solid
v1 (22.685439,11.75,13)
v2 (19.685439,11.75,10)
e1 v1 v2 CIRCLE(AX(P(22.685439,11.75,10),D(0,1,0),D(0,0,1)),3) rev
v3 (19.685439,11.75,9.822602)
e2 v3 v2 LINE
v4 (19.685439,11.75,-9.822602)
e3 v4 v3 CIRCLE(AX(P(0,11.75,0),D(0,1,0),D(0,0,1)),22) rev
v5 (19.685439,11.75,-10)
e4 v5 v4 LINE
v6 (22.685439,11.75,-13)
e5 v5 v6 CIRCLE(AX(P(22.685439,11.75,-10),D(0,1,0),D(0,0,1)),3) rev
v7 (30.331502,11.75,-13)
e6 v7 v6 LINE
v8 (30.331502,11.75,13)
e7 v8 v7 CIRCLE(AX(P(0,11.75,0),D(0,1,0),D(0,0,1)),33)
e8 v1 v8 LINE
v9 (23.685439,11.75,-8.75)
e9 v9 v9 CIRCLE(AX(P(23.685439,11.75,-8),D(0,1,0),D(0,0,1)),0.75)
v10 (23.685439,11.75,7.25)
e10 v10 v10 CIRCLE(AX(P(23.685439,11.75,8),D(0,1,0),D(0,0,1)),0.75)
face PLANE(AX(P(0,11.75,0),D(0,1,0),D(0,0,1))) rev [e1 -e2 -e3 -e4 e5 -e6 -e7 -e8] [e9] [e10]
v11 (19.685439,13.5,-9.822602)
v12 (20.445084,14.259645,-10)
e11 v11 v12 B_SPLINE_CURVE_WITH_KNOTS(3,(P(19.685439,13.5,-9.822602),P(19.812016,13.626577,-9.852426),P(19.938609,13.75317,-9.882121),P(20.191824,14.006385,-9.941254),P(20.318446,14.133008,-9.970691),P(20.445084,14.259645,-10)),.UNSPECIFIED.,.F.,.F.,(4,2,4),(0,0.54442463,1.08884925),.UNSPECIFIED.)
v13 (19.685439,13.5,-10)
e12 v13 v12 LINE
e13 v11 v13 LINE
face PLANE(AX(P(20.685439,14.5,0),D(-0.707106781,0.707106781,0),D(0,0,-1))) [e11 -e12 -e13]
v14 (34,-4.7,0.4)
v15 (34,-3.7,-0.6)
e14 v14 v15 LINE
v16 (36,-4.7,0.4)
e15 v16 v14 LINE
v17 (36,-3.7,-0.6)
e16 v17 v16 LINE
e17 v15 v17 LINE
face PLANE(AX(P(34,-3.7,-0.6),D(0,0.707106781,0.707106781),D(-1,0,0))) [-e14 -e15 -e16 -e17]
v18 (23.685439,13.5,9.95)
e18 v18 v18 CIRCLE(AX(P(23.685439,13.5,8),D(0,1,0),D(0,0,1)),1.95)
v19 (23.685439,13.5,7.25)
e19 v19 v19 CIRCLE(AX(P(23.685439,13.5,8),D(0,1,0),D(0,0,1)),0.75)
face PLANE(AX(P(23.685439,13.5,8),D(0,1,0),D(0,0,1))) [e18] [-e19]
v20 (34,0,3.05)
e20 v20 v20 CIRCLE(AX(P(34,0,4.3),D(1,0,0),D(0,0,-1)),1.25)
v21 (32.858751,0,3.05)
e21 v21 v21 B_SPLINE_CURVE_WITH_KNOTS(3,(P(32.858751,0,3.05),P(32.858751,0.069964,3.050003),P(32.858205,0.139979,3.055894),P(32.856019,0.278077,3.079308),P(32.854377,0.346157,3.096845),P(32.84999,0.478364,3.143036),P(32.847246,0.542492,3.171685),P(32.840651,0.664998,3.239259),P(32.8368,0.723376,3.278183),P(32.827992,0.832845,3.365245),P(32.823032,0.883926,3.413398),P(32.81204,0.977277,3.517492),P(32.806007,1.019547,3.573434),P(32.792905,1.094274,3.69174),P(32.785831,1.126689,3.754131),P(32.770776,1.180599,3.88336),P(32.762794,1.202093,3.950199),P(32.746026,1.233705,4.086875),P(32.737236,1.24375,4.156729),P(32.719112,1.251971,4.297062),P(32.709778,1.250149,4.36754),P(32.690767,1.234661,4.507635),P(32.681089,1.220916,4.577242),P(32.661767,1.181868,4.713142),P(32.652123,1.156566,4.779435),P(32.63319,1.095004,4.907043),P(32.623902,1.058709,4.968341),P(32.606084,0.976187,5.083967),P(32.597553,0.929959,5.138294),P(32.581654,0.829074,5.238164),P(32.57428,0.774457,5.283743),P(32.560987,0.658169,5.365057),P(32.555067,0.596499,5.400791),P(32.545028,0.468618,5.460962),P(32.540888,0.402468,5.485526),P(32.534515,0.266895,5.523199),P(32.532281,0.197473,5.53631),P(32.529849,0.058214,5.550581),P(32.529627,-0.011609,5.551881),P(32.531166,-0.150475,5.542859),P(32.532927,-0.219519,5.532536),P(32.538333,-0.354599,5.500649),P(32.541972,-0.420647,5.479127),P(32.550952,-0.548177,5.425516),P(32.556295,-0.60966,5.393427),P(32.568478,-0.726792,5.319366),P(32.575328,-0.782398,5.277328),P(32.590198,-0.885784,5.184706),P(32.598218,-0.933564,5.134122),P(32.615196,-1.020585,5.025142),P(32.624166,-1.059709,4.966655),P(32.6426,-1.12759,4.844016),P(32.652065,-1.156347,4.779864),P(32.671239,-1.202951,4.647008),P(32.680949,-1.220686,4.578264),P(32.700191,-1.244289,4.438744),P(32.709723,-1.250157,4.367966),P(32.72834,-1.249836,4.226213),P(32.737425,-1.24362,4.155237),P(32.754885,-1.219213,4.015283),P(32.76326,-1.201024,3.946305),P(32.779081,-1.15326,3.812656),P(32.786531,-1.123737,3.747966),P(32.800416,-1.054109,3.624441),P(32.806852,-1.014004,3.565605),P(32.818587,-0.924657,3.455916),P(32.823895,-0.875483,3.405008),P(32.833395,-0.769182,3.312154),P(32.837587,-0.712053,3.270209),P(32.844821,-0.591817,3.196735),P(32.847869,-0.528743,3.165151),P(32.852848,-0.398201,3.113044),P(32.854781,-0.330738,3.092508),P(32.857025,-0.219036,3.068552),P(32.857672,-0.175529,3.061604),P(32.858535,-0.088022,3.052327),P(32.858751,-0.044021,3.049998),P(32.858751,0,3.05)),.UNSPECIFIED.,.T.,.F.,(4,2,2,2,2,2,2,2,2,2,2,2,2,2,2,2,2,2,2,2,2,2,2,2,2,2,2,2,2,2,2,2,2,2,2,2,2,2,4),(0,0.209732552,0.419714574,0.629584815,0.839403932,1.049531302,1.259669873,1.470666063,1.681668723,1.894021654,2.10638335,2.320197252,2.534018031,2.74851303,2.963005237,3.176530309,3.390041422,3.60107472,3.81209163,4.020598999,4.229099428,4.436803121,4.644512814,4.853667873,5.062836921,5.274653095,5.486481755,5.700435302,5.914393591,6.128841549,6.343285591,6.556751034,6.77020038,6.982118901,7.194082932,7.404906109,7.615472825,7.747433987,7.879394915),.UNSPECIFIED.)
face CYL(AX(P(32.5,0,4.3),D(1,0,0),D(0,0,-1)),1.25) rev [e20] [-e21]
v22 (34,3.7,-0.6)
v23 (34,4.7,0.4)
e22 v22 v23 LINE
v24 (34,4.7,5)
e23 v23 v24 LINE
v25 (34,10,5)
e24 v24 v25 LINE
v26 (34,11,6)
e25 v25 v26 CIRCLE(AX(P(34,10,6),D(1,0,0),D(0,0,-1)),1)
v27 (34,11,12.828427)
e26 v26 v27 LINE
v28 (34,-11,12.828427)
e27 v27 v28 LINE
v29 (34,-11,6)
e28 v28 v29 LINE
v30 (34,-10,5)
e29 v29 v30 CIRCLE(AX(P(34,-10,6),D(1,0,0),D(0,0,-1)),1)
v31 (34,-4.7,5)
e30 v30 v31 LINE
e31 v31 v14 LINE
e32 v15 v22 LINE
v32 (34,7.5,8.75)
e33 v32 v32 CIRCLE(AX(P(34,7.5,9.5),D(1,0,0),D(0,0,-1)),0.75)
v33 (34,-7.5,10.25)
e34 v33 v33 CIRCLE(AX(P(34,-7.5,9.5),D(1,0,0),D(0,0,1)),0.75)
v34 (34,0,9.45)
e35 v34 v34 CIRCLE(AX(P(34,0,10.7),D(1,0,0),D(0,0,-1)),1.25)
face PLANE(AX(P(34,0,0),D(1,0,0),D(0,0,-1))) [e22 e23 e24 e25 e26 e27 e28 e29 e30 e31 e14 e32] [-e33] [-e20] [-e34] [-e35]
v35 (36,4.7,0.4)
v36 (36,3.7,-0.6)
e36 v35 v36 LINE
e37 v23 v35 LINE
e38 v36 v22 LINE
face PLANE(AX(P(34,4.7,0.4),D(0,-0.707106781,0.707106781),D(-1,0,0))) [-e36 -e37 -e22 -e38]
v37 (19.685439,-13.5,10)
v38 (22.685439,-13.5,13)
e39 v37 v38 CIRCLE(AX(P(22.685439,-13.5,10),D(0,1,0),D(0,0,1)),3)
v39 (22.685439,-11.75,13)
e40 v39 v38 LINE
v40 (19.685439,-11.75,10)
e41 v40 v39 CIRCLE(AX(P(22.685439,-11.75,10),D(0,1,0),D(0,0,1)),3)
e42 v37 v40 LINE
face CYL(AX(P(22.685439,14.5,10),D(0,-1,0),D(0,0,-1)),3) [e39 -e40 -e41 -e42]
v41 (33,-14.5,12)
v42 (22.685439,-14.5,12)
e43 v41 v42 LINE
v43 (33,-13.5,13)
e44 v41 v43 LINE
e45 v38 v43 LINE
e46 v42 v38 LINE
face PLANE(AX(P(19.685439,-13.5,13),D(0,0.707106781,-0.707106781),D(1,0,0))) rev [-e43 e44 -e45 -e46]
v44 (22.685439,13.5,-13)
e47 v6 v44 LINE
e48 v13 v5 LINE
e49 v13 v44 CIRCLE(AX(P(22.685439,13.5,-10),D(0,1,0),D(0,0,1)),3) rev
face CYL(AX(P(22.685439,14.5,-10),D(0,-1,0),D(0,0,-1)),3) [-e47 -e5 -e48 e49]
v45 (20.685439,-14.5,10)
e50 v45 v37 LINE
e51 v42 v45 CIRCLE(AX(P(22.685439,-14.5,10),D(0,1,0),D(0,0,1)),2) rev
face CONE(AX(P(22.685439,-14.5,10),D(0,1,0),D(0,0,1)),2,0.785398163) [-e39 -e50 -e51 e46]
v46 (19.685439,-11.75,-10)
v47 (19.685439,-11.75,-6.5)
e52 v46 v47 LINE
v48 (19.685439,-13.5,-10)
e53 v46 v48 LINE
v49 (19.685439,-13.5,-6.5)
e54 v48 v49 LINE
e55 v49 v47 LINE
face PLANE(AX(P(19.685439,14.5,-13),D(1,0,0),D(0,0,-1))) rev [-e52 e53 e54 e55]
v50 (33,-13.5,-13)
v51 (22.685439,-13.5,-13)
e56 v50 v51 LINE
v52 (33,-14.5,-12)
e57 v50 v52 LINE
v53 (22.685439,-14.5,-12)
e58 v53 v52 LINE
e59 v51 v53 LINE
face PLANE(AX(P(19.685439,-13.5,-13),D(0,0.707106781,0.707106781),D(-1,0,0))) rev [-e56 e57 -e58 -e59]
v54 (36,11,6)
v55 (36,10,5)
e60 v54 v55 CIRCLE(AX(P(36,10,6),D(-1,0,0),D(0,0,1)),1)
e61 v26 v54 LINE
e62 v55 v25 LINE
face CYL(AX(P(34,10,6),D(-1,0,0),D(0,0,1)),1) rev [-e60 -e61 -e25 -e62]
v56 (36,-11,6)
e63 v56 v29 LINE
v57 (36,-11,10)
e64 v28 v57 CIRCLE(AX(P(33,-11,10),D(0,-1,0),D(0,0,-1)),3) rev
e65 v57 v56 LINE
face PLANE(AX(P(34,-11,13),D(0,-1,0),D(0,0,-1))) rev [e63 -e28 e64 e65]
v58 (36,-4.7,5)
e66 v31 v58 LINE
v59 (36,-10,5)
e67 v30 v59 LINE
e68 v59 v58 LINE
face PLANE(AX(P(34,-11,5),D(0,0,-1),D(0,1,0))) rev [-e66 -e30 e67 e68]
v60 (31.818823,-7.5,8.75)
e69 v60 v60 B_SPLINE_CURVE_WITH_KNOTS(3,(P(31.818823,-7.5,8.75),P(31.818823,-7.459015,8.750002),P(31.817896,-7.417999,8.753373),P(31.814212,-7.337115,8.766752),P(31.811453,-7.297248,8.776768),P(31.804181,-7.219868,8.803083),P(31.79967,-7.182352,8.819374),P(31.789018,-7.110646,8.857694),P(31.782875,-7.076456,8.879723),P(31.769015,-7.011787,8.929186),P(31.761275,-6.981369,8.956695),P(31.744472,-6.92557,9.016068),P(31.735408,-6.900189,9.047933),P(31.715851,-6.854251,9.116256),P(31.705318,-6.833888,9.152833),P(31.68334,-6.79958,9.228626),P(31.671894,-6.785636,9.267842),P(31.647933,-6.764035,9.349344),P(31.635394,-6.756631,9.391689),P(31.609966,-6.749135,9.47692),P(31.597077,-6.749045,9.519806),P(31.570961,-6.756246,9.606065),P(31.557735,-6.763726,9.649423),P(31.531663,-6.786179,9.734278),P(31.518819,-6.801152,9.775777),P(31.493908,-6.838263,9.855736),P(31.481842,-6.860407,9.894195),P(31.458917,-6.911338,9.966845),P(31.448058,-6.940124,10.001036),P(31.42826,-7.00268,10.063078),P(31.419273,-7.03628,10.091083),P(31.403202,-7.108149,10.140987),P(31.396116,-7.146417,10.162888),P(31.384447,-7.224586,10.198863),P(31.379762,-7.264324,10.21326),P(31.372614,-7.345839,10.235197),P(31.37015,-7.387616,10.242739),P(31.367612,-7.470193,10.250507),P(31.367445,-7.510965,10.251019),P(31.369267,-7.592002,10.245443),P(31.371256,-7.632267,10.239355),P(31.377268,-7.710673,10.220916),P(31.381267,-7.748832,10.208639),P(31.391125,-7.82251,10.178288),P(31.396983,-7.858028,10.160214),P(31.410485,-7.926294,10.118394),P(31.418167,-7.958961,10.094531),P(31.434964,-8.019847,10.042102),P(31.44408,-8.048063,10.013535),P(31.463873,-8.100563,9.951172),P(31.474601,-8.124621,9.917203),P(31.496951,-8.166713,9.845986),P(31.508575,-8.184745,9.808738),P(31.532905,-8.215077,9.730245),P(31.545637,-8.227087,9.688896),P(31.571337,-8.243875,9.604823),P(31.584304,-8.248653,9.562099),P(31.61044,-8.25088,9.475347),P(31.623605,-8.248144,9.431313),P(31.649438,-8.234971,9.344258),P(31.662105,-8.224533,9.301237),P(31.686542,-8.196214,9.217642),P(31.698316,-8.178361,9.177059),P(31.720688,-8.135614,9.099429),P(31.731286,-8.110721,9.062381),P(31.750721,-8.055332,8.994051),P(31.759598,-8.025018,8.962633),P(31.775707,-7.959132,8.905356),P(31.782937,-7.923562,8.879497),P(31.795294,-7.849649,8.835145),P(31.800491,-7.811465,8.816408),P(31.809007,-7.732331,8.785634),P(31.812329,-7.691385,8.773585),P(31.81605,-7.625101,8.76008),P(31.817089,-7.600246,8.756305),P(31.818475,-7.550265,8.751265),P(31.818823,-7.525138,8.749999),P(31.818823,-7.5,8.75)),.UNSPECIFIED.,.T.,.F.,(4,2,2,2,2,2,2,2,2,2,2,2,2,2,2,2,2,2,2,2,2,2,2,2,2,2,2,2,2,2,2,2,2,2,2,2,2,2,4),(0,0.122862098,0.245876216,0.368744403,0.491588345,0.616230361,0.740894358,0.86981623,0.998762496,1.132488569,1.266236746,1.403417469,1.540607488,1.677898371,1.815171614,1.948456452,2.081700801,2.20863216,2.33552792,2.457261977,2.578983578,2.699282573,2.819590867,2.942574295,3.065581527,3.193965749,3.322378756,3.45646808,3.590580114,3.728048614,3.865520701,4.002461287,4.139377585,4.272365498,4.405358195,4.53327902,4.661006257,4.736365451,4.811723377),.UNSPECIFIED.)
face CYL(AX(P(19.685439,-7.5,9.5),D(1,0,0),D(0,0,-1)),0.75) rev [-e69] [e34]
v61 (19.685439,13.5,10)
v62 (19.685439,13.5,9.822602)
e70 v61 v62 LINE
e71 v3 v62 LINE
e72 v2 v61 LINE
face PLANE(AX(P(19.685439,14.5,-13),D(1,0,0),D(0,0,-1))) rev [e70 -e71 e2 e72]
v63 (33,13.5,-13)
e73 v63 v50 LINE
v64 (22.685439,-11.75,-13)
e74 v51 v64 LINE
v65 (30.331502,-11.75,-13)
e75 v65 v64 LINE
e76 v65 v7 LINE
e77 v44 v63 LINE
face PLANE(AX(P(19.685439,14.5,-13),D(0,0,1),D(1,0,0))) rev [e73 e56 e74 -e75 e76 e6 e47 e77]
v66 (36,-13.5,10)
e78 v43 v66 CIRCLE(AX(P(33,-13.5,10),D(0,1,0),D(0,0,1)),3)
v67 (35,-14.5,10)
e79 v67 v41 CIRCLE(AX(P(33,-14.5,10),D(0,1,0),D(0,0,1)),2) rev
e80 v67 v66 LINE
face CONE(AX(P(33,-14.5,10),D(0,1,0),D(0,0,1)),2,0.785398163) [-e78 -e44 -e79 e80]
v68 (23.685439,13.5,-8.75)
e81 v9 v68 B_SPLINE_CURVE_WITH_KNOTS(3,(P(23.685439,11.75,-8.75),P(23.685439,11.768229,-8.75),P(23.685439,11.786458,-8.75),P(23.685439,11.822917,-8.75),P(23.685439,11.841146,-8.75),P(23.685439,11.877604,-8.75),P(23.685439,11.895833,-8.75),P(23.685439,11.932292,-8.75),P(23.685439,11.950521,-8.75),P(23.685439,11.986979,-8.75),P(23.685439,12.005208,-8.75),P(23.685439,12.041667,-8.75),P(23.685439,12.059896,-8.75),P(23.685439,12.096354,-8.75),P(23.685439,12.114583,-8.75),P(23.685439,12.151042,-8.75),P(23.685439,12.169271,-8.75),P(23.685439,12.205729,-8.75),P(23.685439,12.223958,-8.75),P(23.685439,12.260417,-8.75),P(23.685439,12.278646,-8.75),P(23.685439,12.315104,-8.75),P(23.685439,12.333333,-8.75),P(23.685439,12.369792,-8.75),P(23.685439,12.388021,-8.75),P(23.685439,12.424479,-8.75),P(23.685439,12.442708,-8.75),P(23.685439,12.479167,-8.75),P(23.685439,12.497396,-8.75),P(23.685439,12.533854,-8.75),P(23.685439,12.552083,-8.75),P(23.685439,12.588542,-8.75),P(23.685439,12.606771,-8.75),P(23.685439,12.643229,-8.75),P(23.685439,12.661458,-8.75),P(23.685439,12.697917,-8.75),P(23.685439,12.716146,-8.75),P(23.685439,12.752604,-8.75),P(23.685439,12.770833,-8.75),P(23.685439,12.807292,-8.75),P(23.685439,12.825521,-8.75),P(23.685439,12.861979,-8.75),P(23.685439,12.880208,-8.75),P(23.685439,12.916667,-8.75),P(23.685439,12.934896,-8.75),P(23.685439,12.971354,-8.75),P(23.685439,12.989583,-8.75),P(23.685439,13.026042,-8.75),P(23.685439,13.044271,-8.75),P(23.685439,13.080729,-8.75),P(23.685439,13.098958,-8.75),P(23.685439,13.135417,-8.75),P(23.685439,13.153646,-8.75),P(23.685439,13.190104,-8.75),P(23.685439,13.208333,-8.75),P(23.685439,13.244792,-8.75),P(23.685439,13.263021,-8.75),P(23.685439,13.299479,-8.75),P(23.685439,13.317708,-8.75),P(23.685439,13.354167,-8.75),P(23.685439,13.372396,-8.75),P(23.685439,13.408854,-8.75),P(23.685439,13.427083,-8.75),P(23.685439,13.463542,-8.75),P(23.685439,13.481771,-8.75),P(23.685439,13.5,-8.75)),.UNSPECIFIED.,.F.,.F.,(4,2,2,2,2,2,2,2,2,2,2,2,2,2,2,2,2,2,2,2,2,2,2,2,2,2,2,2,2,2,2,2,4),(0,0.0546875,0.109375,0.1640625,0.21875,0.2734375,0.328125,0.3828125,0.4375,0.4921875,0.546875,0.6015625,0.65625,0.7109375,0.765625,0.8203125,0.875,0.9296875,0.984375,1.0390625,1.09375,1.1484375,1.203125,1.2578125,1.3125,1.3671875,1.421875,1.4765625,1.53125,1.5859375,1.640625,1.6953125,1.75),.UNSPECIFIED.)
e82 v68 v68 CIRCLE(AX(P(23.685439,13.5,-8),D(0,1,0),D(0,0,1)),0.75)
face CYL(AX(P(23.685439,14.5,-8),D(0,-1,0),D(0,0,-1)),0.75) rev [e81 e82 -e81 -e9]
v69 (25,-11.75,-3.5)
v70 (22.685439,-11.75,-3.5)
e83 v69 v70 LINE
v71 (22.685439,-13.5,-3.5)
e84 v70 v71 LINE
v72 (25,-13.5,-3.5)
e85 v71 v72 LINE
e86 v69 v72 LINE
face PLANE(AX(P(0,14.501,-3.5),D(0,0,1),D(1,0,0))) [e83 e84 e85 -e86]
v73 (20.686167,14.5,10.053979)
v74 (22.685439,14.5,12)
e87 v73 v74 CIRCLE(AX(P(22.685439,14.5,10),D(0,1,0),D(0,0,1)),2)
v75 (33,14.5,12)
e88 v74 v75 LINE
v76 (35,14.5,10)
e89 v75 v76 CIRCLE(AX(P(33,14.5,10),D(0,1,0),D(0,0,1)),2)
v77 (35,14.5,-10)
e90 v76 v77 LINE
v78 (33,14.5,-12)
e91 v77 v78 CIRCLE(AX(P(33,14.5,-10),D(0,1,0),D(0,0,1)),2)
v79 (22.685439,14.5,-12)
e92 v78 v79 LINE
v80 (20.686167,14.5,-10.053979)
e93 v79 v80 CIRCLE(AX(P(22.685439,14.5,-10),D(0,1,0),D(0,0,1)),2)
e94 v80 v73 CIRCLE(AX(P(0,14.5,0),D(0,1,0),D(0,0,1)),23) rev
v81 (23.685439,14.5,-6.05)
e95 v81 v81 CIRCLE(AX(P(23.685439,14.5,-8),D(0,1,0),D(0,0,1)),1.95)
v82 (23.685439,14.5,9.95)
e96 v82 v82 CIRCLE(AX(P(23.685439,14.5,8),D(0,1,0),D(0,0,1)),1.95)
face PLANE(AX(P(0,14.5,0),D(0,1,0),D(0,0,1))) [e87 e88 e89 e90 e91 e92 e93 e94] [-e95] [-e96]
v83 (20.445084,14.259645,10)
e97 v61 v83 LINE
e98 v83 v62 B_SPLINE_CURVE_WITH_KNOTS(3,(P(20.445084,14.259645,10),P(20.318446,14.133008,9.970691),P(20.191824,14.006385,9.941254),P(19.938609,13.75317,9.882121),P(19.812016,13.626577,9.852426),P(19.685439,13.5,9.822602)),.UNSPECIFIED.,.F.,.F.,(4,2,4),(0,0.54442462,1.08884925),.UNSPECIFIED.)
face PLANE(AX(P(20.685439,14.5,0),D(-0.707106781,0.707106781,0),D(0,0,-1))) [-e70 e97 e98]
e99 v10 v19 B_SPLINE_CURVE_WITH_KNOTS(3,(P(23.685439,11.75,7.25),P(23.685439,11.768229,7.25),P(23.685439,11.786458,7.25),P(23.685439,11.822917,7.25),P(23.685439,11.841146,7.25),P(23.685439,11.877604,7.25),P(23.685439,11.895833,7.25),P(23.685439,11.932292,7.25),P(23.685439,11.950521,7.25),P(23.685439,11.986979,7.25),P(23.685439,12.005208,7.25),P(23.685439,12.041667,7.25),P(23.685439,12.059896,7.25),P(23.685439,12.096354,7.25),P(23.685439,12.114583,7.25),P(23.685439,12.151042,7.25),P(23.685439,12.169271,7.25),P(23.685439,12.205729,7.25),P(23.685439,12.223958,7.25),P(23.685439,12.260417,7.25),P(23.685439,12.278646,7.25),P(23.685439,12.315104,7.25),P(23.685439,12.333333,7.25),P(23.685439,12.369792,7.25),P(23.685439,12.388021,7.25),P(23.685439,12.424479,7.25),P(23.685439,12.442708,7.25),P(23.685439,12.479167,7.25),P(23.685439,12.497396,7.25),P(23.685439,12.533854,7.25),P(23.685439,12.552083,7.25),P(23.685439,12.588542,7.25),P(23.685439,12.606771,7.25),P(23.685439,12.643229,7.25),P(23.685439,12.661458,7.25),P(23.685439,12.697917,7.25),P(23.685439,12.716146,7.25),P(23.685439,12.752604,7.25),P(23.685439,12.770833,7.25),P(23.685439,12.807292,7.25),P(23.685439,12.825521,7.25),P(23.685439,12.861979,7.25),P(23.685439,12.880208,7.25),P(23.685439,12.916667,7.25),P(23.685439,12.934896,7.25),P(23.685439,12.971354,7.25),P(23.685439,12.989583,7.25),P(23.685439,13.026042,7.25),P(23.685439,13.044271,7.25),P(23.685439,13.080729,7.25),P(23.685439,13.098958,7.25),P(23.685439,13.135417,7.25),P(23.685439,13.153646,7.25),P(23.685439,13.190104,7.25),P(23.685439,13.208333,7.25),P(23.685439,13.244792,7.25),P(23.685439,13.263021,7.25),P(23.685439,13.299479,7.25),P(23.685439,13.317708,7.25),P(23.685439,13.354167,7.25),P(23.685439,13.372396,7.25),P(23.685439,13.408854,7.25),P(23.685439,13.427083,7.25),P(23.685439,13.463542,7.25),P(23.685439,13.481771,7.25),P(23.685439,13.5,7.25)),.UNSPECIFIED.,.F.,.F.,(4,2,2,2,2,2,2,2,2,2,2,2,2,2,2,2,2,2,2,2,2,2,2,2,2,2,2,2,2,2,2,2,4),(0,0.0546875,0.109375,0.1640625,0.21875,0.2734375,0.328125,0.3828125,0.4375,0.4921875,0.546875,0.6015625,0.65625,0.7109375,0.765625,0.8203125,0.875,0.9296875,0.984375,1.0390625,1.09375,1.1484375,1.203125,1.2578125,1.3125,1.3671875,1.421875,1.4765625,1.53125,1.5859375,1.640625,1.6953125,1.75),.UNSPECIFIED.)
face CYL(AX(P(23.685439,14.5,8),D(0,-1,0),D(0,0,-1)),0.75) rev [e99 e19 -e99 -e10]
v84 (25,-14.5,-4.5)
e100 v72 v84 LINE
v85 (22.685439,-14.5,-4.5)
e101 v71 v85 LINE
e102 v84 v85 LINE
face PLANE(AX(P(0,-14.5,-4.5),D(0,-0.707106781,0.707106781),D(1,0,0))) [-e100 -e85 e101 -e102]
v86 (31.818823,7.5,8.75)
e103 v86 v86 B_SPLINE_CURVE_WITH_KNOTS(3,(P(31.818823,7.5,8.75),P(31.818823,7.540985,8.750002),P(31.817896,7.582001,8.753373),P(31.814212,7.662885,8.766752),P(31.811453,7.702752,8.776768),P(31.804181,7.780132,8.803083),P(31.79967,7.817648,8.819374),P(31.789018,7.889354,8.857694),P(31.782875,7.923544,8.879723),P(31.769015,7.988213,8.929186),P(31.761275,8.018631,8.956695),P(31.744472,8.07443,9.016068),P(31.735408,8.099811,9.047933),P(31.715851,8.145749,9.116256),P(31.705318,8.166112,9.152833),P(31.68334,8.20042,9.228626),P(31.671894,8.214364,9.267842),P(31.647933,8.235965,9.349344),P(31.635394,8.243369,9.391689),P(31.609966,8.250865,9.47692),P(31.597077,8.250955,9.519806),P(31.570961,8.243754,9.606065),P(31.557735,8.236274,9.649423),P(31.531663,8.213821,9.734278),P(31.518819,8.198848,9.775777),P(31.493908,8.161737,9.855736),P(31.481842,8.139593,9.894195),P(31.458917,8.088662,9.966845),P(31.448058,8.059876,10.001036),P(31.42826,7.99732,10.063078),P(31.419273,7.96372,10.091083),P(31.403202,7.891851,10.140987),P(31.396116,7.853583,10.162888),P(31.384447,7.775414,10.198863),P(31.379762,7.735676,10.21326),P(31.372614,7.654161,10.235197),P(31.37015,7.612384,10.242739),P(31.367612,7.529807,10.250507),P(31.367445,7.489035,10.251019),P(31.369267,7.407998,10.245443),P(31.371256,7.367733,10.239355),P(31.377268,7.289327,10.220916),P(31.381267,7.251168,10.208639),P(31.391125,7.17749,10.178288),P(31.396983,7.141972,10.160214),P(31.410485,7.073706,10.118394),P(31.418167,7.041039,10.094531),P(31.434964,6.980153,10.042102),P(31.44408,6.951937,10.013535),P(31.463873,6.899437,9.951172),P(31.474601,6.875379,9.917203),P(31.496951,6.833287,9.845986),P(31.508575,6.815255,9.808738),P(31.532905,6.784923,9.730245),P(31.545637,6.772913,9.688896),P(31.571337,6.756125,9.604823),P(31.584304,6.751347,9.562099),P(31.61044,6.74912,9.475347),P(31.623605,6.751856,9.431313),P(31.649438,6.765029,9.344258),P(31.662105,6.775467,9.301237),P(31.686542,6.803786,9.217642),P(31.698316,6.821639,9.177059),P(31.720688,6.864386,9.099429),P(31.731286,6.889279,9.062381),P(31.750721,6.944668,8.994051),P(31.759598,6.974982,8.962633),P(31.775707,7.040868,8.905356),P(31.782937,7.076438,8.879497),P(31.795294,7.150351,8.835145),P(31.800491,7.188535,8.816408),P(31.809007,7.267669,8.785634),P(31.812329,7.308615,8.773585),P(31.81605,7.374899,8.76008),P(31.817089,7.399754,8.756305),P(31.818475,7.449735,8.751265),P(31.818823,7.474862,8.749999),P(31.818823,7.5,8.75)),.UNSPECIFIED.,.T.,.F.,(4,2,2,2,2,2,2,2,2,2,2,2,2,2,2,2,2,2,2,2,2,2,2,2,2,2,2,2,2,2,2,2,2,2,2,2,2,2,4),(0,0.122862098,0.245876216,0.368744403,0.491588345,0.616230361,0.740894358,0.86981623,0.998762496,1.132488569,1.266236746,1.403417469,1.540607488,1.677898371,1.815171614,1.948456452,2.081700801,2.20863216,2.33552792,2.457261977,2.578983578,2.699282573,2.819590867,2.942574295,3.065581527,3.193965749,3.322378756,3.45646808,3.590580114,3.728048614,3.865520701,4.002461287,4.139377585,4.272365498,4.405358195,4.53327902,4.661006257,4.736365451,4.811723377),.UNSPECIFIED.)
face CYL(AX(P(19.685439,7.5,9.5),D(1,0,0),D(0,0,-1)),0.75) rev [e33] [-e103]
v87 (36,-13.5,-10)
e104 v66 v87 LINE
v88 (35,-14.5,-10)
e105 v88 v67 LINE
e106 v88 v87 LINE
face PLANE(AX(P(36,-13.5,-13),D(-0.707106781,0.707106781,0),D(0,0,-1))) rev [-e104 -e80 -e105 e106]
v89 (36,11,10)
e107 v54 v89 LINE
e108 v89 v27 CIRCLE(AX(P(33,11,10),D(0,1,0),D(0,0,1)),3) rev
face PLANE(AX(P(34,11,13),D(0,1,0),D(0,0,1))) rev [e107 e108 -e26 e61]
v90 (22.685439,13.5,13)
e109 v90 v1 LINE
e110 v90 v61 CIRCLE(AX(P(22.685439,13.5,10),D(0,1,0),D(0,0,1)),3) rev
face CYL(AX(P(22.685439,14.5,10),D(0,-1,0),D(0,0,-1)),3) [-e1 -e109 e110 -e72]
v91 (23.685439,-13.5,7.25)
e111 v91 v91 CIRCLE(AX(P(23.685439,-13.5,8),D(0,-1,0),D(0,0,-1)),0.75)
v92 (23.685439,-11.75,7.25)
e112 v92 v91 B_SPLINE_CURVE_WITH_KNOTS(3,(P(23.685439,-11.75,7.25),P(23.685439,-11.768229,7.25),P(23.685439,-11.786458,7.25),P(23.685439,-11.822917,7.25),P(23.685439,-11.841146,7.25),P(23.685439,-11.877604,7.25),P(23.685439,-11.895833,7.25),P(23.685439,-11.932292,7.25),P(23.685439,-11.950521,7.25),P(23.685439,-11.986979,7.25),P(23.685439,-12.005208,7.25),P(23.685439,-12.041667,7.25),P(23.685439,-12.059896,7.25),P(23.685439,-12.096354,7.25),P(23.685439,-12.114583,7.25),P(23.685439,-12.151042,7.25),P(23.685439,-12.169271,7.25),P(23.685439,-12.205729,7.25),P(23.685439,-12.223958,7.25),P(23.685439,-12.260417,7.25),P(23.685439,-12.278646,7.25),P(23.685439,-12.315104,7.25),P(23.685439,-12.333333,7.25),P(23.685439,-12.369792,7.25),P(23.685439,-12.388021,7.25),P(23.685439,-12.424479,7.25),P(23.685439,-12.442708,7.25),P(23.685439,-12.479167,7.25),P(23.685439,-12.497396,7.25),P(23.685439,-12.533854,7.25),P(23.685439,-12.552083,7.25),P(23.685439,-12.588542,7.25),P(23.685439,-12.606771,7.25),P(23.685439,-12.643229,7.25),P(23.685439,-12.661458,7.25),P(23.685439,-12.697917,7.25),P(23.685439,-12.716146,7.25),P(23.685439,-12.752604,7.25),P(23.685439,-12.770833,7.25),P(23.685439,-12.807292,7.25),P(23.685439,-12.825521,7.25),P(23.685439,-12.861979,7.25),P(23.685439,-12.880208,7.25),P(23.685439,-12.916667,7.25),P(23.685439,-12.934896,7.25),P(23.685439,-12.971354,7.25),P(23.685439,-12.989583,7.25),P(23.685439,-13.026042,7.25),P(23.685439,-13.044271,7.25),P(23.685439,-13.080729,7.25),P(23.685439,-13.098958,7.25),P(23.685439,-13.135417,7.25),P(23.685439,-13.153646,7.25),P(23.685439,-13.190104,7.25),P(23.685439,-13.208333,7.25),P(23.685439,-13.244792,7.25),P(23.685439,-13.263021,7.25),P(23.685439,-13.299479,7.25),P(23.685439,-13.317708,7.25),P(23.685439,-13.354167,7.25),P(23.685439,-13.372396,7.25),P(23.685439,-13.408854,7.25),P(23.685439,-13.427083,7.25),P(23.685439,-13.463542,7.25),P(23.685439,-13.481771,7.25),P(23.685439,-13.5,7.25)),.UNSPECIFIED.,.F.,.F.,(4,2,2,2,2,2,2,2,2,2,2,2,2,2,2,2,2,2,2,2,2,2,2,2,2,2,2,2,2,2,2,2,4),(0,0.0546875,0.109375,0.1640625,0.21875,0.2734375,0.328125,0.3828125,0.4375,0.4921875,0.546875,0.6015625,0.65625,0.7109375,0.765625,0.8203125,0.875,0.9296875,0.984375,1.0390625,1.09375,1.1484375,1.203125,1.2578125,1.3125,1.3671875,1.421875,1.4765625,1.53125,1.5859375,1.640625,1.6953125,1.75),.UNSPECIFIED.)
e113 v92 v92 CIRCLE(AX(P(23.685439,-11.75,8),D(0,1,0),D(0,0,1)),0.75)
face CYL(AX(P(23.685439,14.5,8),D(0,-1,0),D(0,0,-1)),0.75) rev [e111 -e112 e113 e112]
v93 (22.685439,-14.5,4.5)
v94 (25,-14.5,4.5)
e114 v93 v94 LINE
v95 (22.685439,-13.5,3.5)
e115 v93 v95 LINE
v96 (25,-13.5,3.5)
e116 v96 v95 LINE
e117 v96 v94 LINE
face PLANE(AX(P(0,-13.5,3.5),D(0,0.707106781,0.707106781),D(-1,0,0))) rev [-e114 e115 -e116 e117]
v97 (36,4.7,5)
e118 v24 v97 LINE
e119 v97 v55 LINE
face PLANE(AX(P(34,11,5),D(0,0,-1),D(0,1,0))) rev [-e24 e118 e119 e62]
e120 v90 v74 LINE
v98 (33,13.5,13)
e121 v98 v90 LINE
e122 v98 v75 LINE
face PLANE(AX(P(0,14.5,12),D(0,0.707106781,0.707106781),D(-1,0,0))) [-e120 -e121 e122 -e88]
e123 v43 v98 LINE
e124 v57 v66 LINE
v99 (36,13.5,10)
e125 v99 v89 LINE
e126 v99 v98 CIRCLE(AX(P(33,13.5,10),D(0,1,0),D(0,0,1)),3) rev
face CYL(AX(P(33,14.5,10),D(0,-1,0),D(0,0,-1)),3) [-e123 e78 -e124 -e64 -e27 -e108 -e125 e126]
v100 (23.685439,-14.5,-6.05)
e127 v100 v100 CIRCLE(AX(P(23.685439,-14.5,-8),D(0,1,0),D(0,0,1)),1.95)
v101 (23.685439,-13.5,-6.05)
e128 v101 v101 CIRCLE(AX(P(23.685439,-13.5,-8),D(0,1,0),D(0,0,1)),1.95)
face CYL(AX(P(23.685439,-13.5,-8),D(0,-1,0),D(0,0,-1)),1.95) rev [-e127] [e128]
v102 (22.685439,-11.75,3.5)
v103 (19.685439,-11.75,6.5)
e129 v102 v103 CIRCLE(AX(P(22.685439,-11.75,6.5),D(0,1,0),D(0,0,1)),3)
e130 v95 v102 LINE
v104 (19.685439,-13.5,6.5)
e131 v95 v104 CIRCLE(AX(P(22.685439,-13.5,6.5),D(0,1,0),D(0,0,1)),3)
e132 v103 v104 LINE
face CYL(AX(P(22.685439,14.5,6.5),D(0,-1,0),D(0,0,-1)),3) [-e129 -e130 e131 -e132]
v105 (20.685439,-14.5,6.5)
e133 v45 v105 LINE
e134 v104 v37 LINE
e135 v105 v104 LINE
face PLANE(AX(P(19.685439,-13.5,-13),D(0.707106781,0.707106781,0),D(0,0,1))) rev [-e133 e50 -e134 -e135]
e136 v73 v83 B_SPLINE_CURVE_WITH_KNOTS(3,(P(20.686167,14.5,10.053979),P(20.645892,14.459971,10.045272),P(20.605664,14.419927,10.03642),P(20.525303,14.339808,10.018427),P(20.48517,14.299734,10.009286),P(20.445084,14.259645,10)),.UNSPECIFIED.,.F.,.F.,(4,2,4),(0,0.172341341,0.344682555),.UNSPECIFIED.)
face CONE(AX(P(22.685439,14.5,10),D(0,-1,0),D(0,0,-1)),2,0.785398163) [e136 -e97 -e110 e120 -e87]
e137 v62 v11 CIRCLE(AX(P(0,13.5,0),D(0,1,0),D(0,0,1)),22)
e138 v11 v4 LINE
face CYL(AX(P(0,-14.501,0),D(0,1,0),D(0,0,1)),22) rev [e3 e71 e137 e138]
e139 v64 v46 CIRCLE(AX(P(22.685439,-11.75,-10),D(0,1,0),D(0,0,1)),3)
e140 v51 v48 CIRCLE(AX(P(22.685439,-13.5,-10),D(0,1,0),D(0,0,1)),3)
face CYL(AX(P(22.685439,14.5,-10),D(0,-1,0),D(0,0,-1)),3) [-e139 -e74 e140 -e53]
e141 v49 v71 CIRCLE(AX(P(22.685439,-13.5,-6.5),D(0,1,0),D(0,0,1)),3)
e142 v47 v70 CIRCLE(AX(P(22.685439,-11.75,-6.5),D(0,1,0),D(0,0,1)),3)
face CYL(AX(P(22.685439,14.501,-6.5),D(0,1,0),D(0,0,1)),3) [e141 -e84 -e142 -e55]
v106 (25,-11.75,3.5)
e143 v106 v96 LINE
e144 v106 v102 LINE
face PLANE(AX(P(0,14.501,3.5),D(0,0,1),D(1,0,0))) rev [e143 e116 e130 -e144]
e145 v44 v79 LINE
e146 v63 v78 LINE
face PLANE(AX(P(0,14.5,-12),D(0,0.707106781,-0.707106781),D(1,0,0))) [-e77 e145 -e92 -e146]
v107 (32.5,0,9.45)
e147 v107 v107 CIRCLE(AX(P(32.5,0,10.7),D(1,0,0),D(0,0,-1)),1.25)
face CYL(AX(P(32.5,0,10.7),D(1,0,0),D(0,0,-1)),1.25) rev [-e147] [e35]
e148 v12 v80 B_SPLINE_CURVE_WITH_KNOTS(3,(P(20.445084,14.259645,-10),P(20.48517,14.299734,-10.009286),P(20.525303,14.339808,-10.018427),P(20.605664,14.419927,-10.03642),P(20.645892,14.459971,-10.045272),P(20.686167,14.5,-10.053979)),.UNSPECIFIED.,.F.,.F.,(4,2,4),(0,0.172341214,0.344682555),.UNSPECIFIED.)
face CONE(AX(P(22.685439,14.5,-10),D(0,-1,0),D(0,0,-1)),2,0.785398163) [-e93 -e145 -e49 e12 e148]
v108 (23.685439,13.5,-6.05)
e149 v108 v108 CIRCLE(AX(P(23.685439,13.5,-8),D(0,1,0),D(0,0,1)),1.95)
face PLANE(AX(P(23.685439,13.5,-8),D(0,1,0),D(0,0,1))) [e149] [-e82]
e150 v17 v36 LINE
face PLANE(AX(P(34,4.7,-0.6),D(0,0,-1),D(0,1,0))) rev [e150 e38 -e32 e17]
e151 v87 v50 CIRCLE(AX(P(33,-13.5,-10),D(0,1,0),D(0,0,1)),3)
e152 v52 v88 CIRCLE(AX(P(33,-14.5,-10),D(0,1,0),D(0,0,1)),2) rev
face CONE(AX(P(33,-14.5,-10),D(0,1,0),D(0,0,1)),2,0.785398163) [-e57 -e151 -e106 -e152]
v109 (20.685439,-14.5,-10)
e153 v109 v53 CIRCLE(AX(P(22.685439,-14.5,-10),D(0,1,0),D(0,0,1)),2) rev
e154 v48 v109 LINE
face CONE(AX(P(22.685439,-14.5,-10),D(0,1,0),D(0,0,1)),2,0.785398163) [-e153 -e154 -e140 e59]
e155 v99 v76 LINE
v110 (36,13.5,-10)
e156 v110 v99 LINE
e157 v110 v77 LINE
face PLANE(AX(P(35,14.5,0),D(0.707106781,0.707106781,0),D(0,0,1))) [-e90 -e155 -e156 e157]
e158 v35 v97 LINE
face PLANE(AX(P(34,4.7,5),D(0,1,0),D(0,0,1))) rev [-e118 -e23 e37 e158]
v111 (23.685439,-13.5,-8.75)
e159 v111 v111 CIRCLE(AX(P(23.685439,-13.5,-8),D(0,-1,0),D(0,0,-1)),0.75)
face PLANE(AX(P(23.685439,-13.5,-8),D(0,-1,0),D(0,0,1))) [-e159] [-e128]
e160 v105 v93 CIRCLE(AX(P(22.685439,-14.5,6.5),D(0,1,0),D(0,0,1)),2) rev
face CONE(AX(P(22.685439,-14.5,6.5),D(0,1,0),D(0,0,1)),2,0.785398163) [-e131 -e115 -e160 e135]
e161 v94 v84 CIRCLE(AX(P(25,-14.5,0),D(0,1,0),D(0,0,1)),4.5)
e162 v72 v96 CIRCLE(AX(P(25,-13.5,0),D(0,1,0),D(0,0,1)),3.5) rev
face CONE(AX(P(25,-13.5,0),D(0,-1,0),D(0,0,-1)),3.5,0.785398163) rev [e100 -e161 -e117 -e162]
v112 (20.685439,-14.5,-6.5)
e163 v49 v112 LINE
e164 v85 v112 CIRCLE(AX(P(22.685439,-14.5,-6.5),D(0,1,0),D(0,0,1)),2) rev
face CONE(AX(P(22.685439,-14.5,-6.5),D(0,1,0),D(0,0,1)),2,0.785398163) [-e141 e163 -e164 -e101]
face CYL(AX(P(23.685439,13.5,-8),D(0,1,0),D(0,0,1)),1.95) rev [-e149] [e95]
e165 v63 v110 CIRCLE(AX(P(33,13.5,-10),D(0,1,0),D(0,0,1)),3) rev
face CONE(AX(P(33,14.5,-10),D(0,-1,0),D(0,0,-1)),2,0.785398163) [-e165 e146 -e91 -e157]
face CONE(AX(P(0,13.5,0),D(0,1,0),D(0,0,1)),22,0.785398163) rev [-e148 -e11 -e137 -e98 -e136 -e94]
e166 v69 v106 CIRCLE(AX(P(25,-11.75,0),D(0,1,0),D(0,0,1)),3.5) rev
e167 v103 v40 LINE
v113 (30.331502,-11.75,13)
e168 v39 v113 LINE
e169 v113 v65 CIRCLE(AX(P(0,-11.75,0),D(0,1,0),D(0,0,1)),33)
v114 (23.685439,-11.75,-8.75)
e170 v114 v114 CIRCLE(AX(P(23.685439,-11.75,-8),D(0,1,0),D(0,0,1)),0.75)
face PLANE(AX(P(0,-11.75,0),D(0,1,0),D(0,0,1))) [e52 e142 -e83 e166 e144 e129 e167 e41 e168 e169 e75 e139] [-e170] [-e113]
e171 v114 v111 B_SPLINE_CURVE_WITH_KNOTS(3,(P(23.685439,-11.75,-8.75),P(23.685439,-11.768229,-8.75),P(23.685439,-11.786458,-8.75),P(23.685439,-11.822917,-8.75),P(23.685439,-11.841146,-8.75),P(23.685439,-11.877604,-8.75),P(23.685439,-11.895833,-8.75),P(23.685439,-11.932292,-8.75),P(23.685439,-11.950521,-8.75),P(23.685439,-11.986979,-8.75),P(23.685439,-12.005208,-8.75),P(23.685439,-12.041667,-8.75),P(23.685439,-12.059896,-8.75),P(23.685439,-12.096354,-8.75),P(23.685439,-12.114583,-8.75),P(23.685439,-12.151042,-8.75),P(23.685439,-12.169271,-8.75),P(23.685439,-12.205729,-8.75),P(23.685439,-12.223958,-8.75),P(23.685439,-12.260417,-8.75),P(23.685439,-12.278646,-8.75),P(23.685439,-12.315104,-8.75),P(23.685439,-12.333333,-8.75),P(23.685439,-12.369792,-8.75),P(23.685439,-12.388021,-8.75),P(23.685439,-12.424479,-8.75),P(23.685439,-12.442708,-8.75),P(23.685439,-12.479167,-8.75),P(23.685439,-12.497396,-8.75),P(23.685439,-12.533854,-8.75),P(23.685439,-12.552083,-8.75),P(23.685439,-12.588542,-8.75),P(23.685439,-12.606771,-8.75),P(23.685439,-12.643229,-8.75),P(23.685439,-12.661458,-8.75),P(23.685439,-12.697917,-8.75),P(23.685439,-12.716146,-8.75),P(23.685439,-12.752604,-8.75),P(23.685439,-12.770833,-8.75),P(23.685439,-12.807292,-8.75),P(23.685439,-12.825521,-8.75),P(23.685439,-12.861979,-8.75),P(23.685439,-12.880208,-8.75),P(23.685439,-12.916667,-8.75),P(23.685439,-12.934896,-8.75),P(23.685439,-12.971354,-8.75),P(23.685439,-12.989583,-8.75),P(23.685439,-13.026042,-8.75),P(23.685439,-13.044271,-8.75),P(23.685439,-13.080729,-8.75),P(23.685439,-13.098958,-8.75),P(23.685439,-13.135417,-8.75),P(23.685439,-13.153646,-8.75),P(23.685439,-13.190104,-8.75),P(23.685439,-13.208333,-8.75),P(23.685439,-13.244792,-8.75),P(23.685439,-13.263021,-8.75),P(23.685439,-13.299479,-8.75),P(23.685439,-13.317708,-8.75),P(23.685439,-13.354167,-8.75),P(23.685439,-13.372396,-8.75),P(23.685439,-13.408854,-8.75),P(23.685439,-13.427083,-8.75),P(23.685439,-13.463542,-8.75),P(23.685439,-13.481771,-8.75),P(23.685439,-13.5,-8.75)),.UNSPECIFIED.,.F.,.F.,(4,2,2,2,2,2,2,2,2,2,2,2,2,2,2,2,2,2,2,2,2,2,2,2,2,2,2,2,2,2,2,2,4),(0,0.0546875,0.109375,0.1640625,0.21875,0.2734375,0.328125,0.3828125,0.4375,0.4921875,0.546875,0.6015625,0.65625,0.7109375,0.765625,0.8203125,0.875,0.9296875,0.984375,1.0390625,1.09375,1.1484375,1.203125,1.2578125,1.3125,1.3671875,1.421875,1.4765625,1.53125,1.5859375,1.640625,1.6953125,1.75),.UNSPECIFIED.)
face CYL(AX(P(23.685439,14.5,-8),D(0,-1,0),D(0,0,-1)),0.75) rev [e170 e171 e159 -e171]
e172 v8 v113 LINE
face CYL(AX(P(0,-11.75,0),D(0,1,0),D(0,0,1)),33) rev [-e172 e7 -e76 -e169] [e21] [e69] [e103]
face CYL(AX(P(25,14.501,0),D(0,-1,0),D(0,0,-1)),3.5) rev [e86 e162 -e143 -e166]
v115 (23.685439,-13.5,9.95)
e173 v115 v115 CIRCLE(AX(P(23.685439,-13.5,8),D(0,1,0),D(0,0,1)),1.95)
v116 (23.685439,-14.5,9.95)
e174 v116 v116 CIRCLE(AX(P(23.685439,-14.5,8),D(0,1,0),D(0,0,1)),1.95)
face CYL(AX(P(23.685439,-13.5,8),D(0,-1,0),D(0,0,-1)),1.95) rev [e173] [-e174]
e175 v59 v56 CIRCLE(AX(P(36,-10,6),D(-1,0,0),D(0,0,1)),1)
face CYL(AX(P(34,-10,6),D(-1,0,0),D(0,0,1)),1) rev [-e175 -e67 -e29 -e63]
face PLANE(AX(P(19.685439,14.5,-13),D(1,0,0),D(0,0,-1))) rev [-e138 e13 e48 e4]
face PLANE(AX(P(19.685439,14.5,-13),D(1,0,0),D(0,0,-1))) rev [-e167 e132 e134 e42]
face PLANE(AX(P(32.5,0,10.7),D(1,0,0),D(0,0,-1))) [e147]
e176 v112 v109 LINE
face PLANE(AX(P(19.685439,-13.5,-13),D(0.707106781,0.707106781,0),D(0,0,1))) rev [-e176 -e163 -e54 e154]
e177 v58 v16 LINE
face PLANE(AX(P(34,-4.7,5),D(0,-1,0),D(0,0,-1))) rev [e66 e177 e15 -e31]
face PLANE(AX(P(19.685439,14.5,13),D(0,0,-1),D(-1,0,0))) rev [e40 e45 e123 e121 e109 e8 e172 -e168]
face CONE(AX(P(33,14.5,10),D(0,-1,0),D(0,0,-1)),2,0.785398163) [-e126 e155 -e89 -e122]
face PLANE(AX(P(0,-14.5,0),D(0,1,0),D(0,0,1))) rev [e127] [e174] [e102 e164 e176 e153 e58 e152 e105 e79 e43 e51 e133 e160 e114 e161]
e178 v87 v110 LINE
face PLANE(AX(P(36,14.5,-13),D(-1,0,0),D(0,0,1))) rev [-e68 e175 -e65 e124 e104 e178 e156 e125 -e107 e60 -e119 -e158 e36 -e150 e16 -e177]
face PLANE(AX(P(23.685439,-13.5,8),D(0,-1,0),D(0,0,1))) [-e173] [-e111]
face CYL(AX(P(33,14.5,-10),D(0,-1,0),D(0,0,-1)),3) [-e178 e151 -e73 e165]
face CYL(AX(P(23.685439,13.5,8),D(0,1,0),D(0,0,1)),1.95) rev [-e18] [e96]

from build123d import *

# Parameters (mm, degrees)
SKETCH_1_W          = 16.31456143534598
SKETCH_1_H          = 26.000000000000004
SKETCH_1_R          = 0.7500000000000021
EXTRUDE_1_DEPTH     = 14.5
SKETCH_2_R          = 33
CUT_EXTRUDE_1_DEPTH = 11.75
CUT_EXTRUDE_2_DEPTH = 2
CUT_EXTRUDE_7_REACH = 50.021
SKETCH_8_R          = 22
FILLET_1_R          = 1
CHAMFER_1_SIZE      = 1
SKETCH_4_R          = 1.2500000000000002
SKETCH_4_R_2        = 1.2499999999999991
CUT_EXTRUDE_3_DEPTH = 1.5
SKETCH_5_R          = 0.7500000000000004
CUT_EXTRUDE_4_DEPTH = 25.169333290066117
CUT_EXTRUDE_5_REACH = 50.021
FILLET_2_R          = 3
CHAMFER_3_SIZE      = 1
SKETCH_7_R          = 1.949999999999999
CUT_EXTRUDE_6_DEPTH = 1
CHAMFER_4_SIZE      = 1


with BuildPart() as part:
    # Эскиз1 → Бобышка-Вытянуть1 (new, symmetric)
    with BuildSketch(Plane(origin=(0, 0, 0), x_dir=(1, 0, 0), z_dir=(0, 1, 0))):
        with Locations((27.84271928232701, 0)):
            Rectangle(SKETCH_1_W, SKETCH_1_H)
        with Locations(Location((23.68543856465402, -8, 0), (0, 0, 90))):
            Circle(SKETCH_1_R, mode=Mode.SUBTRACT)
        with Locations(Location((23.68543856465402, 8, 0), (0, 0, 90))):
            Circle(SKETCH_1_R, mode=Mode.SUBTRACT)
    extrude(amount=EXTRUDE_1_DEPTH, both=True)

    # Эскиз2 → Вырез-Вытянуть1 (cut, symmetric)
    with BuildSketch(Plane(origin=(0, 0, 0), x_dir=(1, 0, 0), z_dir=(0, 1, 0))):
        Circle(SKETCH_2_R)
    extrude(amount=CUT_EXTRUDE_1_DEPTH, both=True, mode=Mode.SUBTRACT)

    # Эскиз3 → Вырез-Вытянуть2 (cut)
    with BuildSketch(Plane(origin=(36, 0, 0), x_dir=(0, 0, -1), z_dir=(1, 0, 0))):
        Polygon((-13.000000000000004, 10.999999999999998), (-5.000000000000003, 10.999999999999996), (-5.000000000000002, 4.699999999999998), (0.5999999999999969, 4.699999999999999), (0.5999999999999981, -4.699999999999999), (-5.000000000000001, -4.7), (-5, -10.999999999999996), (-13, -11.000000000000002), align=None)
    extrude(amount=-CUT_EXTRUDE_2_DEPTH, mode=Mode.SUBTRACT)

    # Эскиз8 → Вырез-Вытянуть7 (cut, up to next)
    with BuildSketch(Plane(origin=(0, 14.5, 0), x_dir=(1, 0, 0), z_dir=(0, 1, 0)), mode=Mode.PRIVATE) as cut_extrude_7_sk1:
        Circle(SKETCH_8_R)
    cut_extrude_7_tool1 = extrude(cut_extrude_7_sk1.sketch, amount=-CUT_EXTRUDE_7_REACH, mode=Mode.PRIVATE) & part.part
    add(cut_extrude_7_tool1.solids().sort_by_distance((0, 14.5, 0))[0], mode=Mode.SUBTRACT)

    # Скругление1
    fillet_1_edges = [part.edges().sort_by_distance(p)[0] for p in [
        (35, 10.999999999999996, 5.000000000000003),
        (35, -10.999999999999996, 5),
    ]]
    fillet(fillet_1_edges, radius=FILLET_1_R)

    # Фаска1
    chamfer_1_edges = [part.edges().sort_by_distance(p)[0] for p in [
        (35, 4.699999999999999, -0.5999999999999969),
        (35, -4.699999999999999, -0.5999999999999981),
    ]]
    chamfer(chamfer_1_edges, length=CHAMFER_1_SIZE)

    # Эскиз4 → Вырез-Вытянуть3 (cut)
    with BuildSketch(Plane(origin=(33.99999999999999, 0, 0), x_dir=(0, 0, -1), z_dir=(1, 0, 0))):
        with Locations((-4.300000000000002, 0)):
            Circle(SKETCH_4_R)
        with Locations((-10.700000000000001, 0)):
            Circle(SKETCH_4_R_2)
    extrude(amount=-CUT_EXTRUDE_3_DEPTH, mode=Mode.SUBTRACT)

    # Эскиз5 → Вырез-Вытянуть4 (cut, through all)
    with BuildSketch(Plane(origin=(33.99999999999999, 0, 0), x_dir=(0, 0, -1), z_dir=(1, 0, 0))):
        with Locations((-9.500000000000002, 7.5)):
            Circle(SKETCH_5_R)
        with Locations((-9.500000000000002, -7.5)):
            Circle(SKETCH_5_R)
    extrude(amount=-CUT_EXTRUDE_4_DEPTH, mode=Mode.SUBTRACT)

    # Эскиз6 → Вырез-Вытянуть5 (cut, up to next)
    with BuildSketch(Plane.XZ.offset(14.5), mode=Mode.PRIVATE) as cut_extrude_5_sk1:
        with BuildLine():
            ThreePointArc((25, -3.5), (21.5, 4.3e-16), (25, 3.5))
            Line((25, 3.5), (19.68543856465402, 3.499999999999999))
            Line((19.68543856465402, 3.499999999999999), (19.68543856465402, -3.500000000000001))
            Line((19.68543856465402, -3.500000000000001), (25, -3.5))
        make_face()
    cut_extrude_5_tool1 = extrude(cut_extrude_5_sk1.sketch, amount=-CUT_EXTRUDE_5_REACH, mode=Mode.PRIVATE) & part.part
    # Эскиз6 → Вырез-Вытянуть5 (cut, up to next)
    with BuildSketch(Plane.XZ.offset(14.5), mode=Mode.PRIVATE) as cut_extrude_5_sk2:
        with BuildLine():
            ThreePointArc((28.5, 0), (27.474873734152915, 2.474873734152916), (25, 3.5))
            Line((25, 3.5), (25, -3.5))
            ThreePointArc((25, -3.5), (27.474873734152915, -2.474873734152917), (28.5, -8.6e-16))
        make_face()
    cut_extrude_5_tool2 = extrude(cut_extrude_5_sk2.sketch, amount=-CUT_EXTRUDE_5_REACH, mode=Mode.PRIVATE) & part.part
    # Эскиз6 → Вырез-Вытянуть5 (cut, up to next)
    with BuildSketch(Plane.XZ.offset(14.5), mode=Mode.PRIVATE) as cut_extrude_5_sk3:
        with BuildLine():
            Line((25, -3.5), (25, 3.5))
            ThreePointArc((25, 3.5), (21.5, 4.3e-16), (25, -3.5))
        make_face()
    cut_extrude_5_tool3 = extrude(cut_extrude_5_sk3.sketch, amount=-CUT_EXTRUDE_5_REACH, mode=Mode.PRIVATE) & part.part
    # Эскиз6 → Вырез-Вытянуть5 (cut, up to next)
    with BuildSketch(Plane.XZ.offset(14.5), mode=Mode.PRIVATE) as cut_extrude_5_sk4:
        with BuildLine():
            ThreePointArc((28.5, 0), (27.474873734152915, 2.474873734152916), (25, 3.5))
            Line((25, 3.5), (25, -3.5))
            ThreePointArc((25, -3.5), (27.474873734152915, -2.474873734152917), (28.5, -8.6e-16))
        make_face()
    cut_extrude_5_tool4 = extrude(cut_extrude_5_sk4.sketch, amount=-CUT_EXTRUDE_5_REACH, mode=Mode.PRIVATE) & part.part
    # Эскиз6 → Вырез-Вытянуть5 (cut, up to next)
    with BuildSketch(Plane.XZ.offset(14.5), mode=Mode.PRIVATE) as cut_extrude_5_sk5:
        with BuildLine():
            Line((25, -3.5), (25, 3.5))
            ThreePointArc((25, 3.5), (21.5, 4.3e-16), (25, -3.5))
        make_face()
    cut_extrude_5_tool5 = extrude(cut_extrude_5_sk5.sketch, amount=-CUT_EXTRUDE_5_REACH, mode=Mode.PRIVATE) & part.part
    add(cut_extrude_5_tool1.solids().sort_by_distance((21.087199, -14.5, 0))[0], mode=Mode.SUBTRACT)
    add(cut_extrude_5_tool2.solids().sort_by_distance((26.485446, -14.5, 0))[0], mode=Mode.SUBTRACT)
    add(cut_extrude_5_tool3.solids().sort_by_distance((23.514554, -14.5, 0))[0], mode=Mode.SUBTRACT)
    add(cut_extrude_5_tool4.solids().sort_by_distance((26.485446, -14.5, 0))[0], mode=Mode.SUBTRACT)
    add(cut_extrude_5_tool5.solids().sort_by_distance((23.514554, -14.5, 0))[0], mode=Mode.SUBTRACT)

    # Скругление2
    fillet_2_edges = [part.edges().sort_by_distance(p)[0] for p in [
        (19.68543856465402, 13.125, -13),
        (19.68543856465402, 13.125, 13),
        (19.68543856465402, -13.125, -13),
        (19.68543856465402, -13.125, 13),
        (36, 0, -13),
        (36, 12.75, 13),
        (19.68543856465402, -13.125, 3.499999999999999),
        (19.68543856465402, -13.125, -3.500000000000001),
    ]]
    fillet(fillet_2_edges, radius=FILLET_2_R)

    # Фаска3
    chamfer_3_edges = [part.edges().sort_by_distance(p)[0] for p in [
        (23.84271928232701, -14.5, -3.5),
        (28.5, -14.5, -2.56e-15),
        (23.84271928232701, -14.5, 3.5),
        (19.68543856465402, -14.5, 8.25),
        (19.68543856465402, -14.5, -8.25),
        (27.84271928232701, -14.5, -13),
        (36, -14.5, 0),
        (27.84271928232701, -14.5, 13),
        (35.121320343559645, -14.5, 12.121320343559642),
        (35.121320343559645, -14.5, -12.121320343559642),
        (20.56411822109438, -14.5, 12.121320343559642),
        (20.56411822109438, -14.5, -12.121320343559642),
        (20.56411822109438, -14.5, -4.378679656440358),
        (20.56411822109438, -14.5, 4.378679656440358),
        (19.68543856465402, 14.5, -9.911300960978625),
        (27.84271928232701, 14.5, -13),
        (27.84271928232701, 14.5, 13),
        (36, 14.5, 0),
        (35.121320343559645, 14.5, 12.121320343559642),
        (35.121320343559645, 14.5, -12.121320343559642),
        (20.56411822109438, 14.5, 12.121320343559642),
        (20.56411822109438, 14.5, -12.121320343559642),
        (19.68543856465402, 14.5, 9.911300960978625),
    ]]
    chamfer(chamfer_3_edges, length=CHAMFER_3_SIZE)

    # Эскиз7 → Вырез-Вытянуть6 (cut)
    with BuildSketch(Plane(origin=(0, 14.5, 0), x_dir=(1, 0, 0), z_dir=(0, 1, 0))):
        with Locations(Location((23.68543856465402, 8, 0), (0, 0, 270))):
            Circle(SKETCH_7_R)
        with Locations(Location((23.68543856465402, -8, 0), (0, 0, 270))):
            Circle(SKETCH_7_R)
    cut_extrude_6 = extrude(amount=-CUT_EXTRUDE_6_DEPTH, mode=Mode.SUBTRACT)

    # Зеркальное отражение1: Вырез-Вытянуть6 across plane
    add(cut_extrude_6.mirror(Plane.ZX), mode=Mode.SUBTRACT)

    # Фаска4
    # the kernel refuses this chamfer: 1 mm, written as the material it takes off along each edge
    with BuildSketch(Plane(origin=(0, 14.5, 0), x_dir=(0.8941152756835695, 0, -0.44783688301578556), z_dir=(-0.44783688301578556, 0, -0.8941152756835695))) as chamfer_4_piece_1:
        Polygon((21.999999999999993 + CHAMFER_4_SIZE, 0), (21.999999999999996, CHAMFER_4_SIZE), (21.999999999999993, 0), align=None)
    revolve(axis=Axis((0, 14.5, 0), (0, -1, 0)), revolution_arc=53.209970164509144, mode=Mode.SUBTRACT)


solid = part.part
